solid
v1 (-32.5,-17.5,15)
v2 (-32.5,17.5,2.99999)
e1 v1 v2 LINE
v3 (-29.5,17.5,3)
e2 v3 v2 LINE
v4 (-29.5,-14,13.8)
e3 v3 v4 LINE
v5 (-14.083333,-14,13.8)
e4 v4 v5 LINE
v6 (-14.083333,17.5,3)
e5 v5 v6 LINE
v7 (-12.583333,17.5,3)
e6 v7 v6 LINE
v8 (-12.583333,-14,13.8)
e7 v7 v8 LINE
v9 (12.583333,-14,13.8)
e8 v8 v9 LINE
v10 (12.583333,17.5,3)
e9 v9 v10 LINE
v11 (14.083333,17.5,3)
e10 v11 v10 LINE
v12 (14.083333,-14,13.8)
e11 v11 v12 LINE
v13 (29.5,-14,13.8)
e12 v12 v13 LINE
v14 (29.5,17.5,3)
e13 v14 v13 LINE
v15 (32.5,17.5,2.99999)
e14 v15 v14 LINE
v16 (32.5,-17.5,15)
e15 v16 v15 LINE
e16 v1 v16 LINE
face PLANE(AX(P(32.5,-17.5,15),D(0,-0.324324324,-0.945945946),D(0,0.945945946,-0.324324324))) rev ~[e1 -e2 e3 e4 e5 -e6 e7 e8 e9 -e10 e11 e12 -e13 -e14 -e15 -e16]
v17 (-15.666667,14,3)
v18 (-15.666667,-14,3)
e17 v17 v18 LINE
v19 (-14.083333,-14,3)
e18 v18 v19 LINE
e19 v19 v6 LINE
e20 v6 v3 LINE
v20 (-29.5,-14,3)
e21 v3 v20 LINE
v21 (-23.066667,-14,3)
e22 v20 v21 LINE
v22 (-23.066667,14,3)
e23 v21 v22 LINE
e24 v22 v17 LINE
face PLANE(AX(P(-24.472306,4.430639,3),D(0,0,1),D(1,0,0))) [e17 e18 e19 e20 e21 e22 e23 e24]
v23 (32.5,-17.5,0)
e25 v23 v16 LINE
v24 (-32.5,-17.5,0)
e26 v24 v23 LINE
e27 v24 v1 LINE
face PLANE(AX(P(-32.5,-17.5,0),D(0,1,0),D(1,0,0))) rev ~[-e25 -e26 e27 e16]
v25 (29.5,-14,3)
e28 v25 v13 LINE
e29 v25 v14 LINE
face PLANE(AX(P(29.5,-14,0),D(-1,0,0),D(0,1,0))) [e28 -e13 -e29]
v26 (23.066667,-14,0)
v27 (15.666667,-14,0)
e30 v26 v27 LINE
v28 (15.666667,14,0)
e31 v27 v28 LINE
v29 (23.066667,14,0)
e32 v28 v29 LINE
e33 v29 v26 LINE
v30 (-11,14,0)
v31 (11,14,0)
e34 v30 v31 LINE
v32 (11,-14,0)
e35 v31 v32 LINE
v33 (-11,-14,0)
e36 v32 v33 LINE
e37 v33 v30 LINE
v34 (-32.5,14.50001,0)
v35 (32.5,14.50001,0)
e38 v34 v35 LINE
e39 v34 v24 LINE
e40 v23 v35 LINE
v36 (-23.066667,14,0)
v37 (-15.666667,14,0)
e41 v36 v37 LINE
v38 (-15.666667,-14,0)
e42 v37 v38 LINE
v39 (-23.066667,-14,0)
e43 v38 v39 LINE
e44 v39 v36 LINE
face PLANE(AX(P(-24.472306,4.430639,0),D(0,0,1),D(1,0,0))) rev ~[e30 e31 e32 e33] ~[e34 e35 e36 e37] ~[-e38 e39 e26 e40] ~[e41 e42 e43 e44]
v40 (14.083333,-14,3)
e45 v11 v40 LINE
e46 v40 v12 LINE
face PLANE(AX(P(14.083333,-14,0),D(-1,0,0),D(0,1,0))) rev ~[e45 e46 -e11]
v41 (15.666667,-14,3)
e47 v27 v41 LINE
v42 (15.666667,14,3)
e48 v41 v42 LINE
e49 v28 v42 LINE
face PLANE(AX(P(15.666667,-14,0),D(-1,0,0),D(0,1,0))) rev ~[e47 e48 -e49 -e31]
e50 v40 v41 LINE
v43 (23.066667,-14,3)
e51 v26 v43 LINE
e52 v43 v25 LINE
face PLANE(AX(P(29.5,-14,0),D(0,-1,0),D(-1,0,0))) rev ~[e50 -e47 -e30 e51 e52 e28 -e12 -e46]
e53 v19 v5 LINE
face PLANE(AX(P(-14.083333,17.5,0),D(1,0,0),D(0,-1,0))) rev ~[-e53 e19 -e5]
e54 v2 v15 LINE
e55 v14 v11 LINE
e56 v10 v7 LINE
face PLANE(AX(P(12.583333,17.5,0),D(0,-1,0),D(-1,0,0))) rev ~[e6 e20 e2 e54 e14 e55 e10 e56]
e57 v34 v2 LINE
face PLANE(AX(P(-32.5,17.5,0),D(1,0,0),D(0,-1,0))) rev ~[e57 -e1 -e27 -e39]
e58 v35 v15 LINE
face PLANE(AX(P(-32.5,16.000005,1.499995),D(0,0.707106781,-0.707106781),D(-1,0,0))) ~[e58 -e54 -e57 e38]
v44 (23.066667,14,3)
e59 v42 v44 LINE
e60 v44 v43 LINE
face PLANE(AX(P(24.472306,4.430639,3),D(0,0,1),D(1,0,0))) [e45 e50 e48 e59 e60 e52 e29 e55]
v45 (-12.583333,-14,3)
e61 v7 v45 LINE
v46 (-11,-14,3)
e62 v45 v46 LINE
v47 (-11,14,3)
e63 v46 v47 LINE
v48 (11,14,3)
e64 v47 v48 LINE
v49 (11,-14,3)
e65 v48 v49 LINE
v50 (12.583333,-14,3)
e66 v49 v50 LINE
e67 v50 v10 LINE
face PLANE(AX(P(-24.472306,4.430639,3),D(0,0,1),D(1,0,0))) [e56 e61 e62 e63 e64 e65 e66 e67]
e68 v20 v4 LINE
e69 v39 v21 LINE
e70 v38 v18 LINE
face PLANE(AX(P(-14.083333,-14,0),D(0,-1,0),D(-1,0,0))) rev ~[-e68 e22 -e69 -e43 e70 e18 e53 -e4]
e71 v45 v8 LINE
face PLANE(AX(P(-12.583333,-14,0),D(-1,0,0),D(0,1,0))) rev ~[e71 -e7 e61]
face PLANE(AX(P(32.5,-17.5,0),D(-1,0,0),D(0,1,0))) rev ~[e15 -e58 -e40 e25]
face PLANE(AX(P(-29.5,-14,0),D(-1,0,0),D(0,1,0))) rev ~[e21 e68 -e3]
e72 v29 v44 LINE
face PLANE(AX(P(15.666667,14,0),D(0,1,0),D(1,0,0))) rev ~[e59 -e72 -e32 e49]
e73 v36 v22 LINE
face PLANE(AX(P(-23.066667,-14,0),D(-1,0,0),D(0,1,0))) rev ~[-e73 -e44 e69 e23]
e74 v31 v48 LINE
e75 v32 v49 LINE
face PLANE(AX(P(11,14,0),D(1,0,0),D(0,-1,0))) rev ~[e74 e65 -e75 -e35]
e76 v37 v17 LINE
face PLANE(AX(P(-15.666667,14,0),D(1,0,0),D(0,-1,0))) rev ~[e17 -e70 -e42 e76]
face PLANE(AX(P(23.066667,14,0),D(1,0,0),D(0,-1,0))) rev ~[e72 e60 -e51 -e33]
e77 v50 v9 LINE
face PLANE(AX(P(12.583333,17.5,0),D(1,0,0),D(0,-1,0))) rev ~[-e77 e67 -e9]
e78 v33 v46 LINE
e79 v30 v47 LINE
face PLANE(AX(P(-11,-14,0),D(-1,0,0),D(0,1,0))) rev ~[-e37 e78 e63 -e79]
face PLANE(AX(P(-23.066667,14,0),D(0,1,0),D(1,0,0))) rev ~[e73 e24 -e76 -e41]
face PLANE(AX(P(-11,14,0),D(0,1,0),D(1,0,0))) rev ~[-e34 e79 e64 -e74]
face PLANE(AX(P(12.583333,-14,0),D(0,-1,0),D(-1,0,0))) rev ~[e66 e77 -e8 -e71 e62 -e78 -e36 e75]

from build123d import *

# Parameters (mm, degrees)
F0_W     = 3
F0_H     = 31.5
F0_H_2   = 3.5
F0_W_2   = 1.5
F0_W_3   = 0.75
F0_H_3   = 13.2339229211
F1_DEPTH = 15
F2_DEPTH = 3
F3_SIZE  = 2.99999
F5_DEPTH = 83.7


# Not quite as in the source:
# - a fillet or chamfer is up to 0.001 mm smaller than in the source, because OpenCascade refuses the exact size


with BuildPart() as f1:
    # F0 (on Top) → F1 (new body)
    with BuildSketch(Plane.XY):
        with Locations((-31, 1.75)):
            Rectangle(F0_W, F0_H)
        with Locations((-31, -15.75)):
            Rectangle(F0_W, F0_H_2)
        with Locations((-13.3333333333, -15.75)):
            Rectangle(F0_W_2, F0_H_2)
        Polygon((-13.3333333333, 0.7660770789), (-14.0833333333, 0.7660770789), (-14.0833333333, -14), (-12.5833333333, -14), (-12.5833333333, 0.7660770789), align=None)
        with Locations((-13.7083333333, 7.3830385394)):
            Rectangle(F0_W_3, F0_H_3)
        with Locations((-12.9583333333, 7.3830385394)):
            Rectangle(F0_W_3, F0_H_3)
        with Locations((-13.7083333333, 15.75)):
            Rectangle(F0_W_3, F0_H_2)
        with Locations((-12.9583333333, 15.75)):
            Rectangle(F0_W_3, F0_H_2)
        Polygon((-12.5833333333, -14), (-12.5833333333, -17.5), (12.5833333333, -17.5), (12.5833333333, -14), (11, -14), (-11, -14), align=None)
        Polygon((-23.0666666667, -14), (-29.5, -14), (-29.5, -17.5), (-14.0833333333, -17.5), (-14.0833333333, -14), (-15.6666666667, -14), (-19.3666666667, -14), align=None)
        with Locations((13.3333333333, -15.75)):
            Rectangle(F0_W_2, F0_H_2)
        with Locations((31, -15.75)):
            Rectangle(F0_W, F0_H_2)
        Polygon((13.3333333333, 14), (12.5833333333, 14), (12.5833333333, 0.7660770789), (12.5833333333, -14), (14.0833333333, -14), (14.0833333333, 0.7660770789), (14.0833333333, 14), align=None)
        with Locations((13.7083333333, 15.75)):
            Rectangle(F0_W_3, F0_H_2)
        with Locations((12.9583333333, 15.75)):
            Rectangle(F0_W_3, F0_H_2)
        Polygon((14.0833333333, -14), (14.0833333333, -17.5), (29.5, -17.5), (29.5, -14), (23.0666666667, -14), (19.3666666667, -14), (15.6666666667, -14), align=None)
        with Locations((31, 1.75)):
            Rectangle(F0_W, F0_H)
    extrude(amount=F1_DEPTH)

    # F0 (on Top) → F2 (join)
    with BuildSketch(Plane.XY):
        Polygon((-14.0833333333, 17.5), (-29.5, 17.5), (-29.5, -14), (-23.0666666667, -14), (-23.0666666667, 14), (-19.3666666667, 14), (-15.6666666667, 14), (-14.0833333333, 14), align=None)
        Polygon((-14.0833333333, 0.7660770789), (-14.0833333333, 14), (-15.6666666667, 14), (-15.6666666667, -14), (-14.0833333333, -14), align=None)
        Polygon((-11, 14), (-12.5833333333, 14), (-12.5833333333, 0.7660770789), (-12.5833333333, -14), (-11, -14), align=None)
        Polygon((12.5833333333, 17.5), (-12.5833333333, 17.5), (-12.5833333333, 14), (-11, 14), (11, 14), (12.5833333333, 14), align=None)
        with Locations((-13.7083333333, 15.75)):
            Rectangle(F0_W_3, F0_H_2)
        with Locations((-12.9583333333, 15.75)):
            Rectangle(F0_W_3, F0_H_2)
        Polygon((29.5, 17.5), (14.0833333333, 17.5), (14.0833333333, 14), (15.6666666667, 14), (19.3666666667, 14), (23.0666666667, 14), (23.0666666667, -14), (29.5, -14), align=None)
        Polygon((12.5833333333, 0.7660770789), (12.5833333333, 14), (11, 14), (11, -14), (12.5833333333, -14), align=None)
        Polygon((15.6666666667, 14), (14.0833333333, 14), (14.0833333333, 0.7660770789), (14.0833333333, -14), (15.6666666667, -14), align=None)
    extrude(amount=F2_DEPTH)

    # F3 (size 3 in the source; OpenCascade refuses exactly that, so slightly less here)
    f3_edges = [f1.edges().sort_by_distance(p)[0] for p in [
        (0, 17.5, 0),
    ]]
    chamfer(f3_edges, length=F3_SIZE)

    # F4 (on face) → F5 (cut)
    with BuildSketch(Plane.YZ.offset(32.5)):
        Polygon((-17.5, 15), (17.5, 3), (17.5, 15), align=None)
    extrude(amount=-F5_DEPTH, mode=Mode.SUBTRACT)


solid = f1.part
